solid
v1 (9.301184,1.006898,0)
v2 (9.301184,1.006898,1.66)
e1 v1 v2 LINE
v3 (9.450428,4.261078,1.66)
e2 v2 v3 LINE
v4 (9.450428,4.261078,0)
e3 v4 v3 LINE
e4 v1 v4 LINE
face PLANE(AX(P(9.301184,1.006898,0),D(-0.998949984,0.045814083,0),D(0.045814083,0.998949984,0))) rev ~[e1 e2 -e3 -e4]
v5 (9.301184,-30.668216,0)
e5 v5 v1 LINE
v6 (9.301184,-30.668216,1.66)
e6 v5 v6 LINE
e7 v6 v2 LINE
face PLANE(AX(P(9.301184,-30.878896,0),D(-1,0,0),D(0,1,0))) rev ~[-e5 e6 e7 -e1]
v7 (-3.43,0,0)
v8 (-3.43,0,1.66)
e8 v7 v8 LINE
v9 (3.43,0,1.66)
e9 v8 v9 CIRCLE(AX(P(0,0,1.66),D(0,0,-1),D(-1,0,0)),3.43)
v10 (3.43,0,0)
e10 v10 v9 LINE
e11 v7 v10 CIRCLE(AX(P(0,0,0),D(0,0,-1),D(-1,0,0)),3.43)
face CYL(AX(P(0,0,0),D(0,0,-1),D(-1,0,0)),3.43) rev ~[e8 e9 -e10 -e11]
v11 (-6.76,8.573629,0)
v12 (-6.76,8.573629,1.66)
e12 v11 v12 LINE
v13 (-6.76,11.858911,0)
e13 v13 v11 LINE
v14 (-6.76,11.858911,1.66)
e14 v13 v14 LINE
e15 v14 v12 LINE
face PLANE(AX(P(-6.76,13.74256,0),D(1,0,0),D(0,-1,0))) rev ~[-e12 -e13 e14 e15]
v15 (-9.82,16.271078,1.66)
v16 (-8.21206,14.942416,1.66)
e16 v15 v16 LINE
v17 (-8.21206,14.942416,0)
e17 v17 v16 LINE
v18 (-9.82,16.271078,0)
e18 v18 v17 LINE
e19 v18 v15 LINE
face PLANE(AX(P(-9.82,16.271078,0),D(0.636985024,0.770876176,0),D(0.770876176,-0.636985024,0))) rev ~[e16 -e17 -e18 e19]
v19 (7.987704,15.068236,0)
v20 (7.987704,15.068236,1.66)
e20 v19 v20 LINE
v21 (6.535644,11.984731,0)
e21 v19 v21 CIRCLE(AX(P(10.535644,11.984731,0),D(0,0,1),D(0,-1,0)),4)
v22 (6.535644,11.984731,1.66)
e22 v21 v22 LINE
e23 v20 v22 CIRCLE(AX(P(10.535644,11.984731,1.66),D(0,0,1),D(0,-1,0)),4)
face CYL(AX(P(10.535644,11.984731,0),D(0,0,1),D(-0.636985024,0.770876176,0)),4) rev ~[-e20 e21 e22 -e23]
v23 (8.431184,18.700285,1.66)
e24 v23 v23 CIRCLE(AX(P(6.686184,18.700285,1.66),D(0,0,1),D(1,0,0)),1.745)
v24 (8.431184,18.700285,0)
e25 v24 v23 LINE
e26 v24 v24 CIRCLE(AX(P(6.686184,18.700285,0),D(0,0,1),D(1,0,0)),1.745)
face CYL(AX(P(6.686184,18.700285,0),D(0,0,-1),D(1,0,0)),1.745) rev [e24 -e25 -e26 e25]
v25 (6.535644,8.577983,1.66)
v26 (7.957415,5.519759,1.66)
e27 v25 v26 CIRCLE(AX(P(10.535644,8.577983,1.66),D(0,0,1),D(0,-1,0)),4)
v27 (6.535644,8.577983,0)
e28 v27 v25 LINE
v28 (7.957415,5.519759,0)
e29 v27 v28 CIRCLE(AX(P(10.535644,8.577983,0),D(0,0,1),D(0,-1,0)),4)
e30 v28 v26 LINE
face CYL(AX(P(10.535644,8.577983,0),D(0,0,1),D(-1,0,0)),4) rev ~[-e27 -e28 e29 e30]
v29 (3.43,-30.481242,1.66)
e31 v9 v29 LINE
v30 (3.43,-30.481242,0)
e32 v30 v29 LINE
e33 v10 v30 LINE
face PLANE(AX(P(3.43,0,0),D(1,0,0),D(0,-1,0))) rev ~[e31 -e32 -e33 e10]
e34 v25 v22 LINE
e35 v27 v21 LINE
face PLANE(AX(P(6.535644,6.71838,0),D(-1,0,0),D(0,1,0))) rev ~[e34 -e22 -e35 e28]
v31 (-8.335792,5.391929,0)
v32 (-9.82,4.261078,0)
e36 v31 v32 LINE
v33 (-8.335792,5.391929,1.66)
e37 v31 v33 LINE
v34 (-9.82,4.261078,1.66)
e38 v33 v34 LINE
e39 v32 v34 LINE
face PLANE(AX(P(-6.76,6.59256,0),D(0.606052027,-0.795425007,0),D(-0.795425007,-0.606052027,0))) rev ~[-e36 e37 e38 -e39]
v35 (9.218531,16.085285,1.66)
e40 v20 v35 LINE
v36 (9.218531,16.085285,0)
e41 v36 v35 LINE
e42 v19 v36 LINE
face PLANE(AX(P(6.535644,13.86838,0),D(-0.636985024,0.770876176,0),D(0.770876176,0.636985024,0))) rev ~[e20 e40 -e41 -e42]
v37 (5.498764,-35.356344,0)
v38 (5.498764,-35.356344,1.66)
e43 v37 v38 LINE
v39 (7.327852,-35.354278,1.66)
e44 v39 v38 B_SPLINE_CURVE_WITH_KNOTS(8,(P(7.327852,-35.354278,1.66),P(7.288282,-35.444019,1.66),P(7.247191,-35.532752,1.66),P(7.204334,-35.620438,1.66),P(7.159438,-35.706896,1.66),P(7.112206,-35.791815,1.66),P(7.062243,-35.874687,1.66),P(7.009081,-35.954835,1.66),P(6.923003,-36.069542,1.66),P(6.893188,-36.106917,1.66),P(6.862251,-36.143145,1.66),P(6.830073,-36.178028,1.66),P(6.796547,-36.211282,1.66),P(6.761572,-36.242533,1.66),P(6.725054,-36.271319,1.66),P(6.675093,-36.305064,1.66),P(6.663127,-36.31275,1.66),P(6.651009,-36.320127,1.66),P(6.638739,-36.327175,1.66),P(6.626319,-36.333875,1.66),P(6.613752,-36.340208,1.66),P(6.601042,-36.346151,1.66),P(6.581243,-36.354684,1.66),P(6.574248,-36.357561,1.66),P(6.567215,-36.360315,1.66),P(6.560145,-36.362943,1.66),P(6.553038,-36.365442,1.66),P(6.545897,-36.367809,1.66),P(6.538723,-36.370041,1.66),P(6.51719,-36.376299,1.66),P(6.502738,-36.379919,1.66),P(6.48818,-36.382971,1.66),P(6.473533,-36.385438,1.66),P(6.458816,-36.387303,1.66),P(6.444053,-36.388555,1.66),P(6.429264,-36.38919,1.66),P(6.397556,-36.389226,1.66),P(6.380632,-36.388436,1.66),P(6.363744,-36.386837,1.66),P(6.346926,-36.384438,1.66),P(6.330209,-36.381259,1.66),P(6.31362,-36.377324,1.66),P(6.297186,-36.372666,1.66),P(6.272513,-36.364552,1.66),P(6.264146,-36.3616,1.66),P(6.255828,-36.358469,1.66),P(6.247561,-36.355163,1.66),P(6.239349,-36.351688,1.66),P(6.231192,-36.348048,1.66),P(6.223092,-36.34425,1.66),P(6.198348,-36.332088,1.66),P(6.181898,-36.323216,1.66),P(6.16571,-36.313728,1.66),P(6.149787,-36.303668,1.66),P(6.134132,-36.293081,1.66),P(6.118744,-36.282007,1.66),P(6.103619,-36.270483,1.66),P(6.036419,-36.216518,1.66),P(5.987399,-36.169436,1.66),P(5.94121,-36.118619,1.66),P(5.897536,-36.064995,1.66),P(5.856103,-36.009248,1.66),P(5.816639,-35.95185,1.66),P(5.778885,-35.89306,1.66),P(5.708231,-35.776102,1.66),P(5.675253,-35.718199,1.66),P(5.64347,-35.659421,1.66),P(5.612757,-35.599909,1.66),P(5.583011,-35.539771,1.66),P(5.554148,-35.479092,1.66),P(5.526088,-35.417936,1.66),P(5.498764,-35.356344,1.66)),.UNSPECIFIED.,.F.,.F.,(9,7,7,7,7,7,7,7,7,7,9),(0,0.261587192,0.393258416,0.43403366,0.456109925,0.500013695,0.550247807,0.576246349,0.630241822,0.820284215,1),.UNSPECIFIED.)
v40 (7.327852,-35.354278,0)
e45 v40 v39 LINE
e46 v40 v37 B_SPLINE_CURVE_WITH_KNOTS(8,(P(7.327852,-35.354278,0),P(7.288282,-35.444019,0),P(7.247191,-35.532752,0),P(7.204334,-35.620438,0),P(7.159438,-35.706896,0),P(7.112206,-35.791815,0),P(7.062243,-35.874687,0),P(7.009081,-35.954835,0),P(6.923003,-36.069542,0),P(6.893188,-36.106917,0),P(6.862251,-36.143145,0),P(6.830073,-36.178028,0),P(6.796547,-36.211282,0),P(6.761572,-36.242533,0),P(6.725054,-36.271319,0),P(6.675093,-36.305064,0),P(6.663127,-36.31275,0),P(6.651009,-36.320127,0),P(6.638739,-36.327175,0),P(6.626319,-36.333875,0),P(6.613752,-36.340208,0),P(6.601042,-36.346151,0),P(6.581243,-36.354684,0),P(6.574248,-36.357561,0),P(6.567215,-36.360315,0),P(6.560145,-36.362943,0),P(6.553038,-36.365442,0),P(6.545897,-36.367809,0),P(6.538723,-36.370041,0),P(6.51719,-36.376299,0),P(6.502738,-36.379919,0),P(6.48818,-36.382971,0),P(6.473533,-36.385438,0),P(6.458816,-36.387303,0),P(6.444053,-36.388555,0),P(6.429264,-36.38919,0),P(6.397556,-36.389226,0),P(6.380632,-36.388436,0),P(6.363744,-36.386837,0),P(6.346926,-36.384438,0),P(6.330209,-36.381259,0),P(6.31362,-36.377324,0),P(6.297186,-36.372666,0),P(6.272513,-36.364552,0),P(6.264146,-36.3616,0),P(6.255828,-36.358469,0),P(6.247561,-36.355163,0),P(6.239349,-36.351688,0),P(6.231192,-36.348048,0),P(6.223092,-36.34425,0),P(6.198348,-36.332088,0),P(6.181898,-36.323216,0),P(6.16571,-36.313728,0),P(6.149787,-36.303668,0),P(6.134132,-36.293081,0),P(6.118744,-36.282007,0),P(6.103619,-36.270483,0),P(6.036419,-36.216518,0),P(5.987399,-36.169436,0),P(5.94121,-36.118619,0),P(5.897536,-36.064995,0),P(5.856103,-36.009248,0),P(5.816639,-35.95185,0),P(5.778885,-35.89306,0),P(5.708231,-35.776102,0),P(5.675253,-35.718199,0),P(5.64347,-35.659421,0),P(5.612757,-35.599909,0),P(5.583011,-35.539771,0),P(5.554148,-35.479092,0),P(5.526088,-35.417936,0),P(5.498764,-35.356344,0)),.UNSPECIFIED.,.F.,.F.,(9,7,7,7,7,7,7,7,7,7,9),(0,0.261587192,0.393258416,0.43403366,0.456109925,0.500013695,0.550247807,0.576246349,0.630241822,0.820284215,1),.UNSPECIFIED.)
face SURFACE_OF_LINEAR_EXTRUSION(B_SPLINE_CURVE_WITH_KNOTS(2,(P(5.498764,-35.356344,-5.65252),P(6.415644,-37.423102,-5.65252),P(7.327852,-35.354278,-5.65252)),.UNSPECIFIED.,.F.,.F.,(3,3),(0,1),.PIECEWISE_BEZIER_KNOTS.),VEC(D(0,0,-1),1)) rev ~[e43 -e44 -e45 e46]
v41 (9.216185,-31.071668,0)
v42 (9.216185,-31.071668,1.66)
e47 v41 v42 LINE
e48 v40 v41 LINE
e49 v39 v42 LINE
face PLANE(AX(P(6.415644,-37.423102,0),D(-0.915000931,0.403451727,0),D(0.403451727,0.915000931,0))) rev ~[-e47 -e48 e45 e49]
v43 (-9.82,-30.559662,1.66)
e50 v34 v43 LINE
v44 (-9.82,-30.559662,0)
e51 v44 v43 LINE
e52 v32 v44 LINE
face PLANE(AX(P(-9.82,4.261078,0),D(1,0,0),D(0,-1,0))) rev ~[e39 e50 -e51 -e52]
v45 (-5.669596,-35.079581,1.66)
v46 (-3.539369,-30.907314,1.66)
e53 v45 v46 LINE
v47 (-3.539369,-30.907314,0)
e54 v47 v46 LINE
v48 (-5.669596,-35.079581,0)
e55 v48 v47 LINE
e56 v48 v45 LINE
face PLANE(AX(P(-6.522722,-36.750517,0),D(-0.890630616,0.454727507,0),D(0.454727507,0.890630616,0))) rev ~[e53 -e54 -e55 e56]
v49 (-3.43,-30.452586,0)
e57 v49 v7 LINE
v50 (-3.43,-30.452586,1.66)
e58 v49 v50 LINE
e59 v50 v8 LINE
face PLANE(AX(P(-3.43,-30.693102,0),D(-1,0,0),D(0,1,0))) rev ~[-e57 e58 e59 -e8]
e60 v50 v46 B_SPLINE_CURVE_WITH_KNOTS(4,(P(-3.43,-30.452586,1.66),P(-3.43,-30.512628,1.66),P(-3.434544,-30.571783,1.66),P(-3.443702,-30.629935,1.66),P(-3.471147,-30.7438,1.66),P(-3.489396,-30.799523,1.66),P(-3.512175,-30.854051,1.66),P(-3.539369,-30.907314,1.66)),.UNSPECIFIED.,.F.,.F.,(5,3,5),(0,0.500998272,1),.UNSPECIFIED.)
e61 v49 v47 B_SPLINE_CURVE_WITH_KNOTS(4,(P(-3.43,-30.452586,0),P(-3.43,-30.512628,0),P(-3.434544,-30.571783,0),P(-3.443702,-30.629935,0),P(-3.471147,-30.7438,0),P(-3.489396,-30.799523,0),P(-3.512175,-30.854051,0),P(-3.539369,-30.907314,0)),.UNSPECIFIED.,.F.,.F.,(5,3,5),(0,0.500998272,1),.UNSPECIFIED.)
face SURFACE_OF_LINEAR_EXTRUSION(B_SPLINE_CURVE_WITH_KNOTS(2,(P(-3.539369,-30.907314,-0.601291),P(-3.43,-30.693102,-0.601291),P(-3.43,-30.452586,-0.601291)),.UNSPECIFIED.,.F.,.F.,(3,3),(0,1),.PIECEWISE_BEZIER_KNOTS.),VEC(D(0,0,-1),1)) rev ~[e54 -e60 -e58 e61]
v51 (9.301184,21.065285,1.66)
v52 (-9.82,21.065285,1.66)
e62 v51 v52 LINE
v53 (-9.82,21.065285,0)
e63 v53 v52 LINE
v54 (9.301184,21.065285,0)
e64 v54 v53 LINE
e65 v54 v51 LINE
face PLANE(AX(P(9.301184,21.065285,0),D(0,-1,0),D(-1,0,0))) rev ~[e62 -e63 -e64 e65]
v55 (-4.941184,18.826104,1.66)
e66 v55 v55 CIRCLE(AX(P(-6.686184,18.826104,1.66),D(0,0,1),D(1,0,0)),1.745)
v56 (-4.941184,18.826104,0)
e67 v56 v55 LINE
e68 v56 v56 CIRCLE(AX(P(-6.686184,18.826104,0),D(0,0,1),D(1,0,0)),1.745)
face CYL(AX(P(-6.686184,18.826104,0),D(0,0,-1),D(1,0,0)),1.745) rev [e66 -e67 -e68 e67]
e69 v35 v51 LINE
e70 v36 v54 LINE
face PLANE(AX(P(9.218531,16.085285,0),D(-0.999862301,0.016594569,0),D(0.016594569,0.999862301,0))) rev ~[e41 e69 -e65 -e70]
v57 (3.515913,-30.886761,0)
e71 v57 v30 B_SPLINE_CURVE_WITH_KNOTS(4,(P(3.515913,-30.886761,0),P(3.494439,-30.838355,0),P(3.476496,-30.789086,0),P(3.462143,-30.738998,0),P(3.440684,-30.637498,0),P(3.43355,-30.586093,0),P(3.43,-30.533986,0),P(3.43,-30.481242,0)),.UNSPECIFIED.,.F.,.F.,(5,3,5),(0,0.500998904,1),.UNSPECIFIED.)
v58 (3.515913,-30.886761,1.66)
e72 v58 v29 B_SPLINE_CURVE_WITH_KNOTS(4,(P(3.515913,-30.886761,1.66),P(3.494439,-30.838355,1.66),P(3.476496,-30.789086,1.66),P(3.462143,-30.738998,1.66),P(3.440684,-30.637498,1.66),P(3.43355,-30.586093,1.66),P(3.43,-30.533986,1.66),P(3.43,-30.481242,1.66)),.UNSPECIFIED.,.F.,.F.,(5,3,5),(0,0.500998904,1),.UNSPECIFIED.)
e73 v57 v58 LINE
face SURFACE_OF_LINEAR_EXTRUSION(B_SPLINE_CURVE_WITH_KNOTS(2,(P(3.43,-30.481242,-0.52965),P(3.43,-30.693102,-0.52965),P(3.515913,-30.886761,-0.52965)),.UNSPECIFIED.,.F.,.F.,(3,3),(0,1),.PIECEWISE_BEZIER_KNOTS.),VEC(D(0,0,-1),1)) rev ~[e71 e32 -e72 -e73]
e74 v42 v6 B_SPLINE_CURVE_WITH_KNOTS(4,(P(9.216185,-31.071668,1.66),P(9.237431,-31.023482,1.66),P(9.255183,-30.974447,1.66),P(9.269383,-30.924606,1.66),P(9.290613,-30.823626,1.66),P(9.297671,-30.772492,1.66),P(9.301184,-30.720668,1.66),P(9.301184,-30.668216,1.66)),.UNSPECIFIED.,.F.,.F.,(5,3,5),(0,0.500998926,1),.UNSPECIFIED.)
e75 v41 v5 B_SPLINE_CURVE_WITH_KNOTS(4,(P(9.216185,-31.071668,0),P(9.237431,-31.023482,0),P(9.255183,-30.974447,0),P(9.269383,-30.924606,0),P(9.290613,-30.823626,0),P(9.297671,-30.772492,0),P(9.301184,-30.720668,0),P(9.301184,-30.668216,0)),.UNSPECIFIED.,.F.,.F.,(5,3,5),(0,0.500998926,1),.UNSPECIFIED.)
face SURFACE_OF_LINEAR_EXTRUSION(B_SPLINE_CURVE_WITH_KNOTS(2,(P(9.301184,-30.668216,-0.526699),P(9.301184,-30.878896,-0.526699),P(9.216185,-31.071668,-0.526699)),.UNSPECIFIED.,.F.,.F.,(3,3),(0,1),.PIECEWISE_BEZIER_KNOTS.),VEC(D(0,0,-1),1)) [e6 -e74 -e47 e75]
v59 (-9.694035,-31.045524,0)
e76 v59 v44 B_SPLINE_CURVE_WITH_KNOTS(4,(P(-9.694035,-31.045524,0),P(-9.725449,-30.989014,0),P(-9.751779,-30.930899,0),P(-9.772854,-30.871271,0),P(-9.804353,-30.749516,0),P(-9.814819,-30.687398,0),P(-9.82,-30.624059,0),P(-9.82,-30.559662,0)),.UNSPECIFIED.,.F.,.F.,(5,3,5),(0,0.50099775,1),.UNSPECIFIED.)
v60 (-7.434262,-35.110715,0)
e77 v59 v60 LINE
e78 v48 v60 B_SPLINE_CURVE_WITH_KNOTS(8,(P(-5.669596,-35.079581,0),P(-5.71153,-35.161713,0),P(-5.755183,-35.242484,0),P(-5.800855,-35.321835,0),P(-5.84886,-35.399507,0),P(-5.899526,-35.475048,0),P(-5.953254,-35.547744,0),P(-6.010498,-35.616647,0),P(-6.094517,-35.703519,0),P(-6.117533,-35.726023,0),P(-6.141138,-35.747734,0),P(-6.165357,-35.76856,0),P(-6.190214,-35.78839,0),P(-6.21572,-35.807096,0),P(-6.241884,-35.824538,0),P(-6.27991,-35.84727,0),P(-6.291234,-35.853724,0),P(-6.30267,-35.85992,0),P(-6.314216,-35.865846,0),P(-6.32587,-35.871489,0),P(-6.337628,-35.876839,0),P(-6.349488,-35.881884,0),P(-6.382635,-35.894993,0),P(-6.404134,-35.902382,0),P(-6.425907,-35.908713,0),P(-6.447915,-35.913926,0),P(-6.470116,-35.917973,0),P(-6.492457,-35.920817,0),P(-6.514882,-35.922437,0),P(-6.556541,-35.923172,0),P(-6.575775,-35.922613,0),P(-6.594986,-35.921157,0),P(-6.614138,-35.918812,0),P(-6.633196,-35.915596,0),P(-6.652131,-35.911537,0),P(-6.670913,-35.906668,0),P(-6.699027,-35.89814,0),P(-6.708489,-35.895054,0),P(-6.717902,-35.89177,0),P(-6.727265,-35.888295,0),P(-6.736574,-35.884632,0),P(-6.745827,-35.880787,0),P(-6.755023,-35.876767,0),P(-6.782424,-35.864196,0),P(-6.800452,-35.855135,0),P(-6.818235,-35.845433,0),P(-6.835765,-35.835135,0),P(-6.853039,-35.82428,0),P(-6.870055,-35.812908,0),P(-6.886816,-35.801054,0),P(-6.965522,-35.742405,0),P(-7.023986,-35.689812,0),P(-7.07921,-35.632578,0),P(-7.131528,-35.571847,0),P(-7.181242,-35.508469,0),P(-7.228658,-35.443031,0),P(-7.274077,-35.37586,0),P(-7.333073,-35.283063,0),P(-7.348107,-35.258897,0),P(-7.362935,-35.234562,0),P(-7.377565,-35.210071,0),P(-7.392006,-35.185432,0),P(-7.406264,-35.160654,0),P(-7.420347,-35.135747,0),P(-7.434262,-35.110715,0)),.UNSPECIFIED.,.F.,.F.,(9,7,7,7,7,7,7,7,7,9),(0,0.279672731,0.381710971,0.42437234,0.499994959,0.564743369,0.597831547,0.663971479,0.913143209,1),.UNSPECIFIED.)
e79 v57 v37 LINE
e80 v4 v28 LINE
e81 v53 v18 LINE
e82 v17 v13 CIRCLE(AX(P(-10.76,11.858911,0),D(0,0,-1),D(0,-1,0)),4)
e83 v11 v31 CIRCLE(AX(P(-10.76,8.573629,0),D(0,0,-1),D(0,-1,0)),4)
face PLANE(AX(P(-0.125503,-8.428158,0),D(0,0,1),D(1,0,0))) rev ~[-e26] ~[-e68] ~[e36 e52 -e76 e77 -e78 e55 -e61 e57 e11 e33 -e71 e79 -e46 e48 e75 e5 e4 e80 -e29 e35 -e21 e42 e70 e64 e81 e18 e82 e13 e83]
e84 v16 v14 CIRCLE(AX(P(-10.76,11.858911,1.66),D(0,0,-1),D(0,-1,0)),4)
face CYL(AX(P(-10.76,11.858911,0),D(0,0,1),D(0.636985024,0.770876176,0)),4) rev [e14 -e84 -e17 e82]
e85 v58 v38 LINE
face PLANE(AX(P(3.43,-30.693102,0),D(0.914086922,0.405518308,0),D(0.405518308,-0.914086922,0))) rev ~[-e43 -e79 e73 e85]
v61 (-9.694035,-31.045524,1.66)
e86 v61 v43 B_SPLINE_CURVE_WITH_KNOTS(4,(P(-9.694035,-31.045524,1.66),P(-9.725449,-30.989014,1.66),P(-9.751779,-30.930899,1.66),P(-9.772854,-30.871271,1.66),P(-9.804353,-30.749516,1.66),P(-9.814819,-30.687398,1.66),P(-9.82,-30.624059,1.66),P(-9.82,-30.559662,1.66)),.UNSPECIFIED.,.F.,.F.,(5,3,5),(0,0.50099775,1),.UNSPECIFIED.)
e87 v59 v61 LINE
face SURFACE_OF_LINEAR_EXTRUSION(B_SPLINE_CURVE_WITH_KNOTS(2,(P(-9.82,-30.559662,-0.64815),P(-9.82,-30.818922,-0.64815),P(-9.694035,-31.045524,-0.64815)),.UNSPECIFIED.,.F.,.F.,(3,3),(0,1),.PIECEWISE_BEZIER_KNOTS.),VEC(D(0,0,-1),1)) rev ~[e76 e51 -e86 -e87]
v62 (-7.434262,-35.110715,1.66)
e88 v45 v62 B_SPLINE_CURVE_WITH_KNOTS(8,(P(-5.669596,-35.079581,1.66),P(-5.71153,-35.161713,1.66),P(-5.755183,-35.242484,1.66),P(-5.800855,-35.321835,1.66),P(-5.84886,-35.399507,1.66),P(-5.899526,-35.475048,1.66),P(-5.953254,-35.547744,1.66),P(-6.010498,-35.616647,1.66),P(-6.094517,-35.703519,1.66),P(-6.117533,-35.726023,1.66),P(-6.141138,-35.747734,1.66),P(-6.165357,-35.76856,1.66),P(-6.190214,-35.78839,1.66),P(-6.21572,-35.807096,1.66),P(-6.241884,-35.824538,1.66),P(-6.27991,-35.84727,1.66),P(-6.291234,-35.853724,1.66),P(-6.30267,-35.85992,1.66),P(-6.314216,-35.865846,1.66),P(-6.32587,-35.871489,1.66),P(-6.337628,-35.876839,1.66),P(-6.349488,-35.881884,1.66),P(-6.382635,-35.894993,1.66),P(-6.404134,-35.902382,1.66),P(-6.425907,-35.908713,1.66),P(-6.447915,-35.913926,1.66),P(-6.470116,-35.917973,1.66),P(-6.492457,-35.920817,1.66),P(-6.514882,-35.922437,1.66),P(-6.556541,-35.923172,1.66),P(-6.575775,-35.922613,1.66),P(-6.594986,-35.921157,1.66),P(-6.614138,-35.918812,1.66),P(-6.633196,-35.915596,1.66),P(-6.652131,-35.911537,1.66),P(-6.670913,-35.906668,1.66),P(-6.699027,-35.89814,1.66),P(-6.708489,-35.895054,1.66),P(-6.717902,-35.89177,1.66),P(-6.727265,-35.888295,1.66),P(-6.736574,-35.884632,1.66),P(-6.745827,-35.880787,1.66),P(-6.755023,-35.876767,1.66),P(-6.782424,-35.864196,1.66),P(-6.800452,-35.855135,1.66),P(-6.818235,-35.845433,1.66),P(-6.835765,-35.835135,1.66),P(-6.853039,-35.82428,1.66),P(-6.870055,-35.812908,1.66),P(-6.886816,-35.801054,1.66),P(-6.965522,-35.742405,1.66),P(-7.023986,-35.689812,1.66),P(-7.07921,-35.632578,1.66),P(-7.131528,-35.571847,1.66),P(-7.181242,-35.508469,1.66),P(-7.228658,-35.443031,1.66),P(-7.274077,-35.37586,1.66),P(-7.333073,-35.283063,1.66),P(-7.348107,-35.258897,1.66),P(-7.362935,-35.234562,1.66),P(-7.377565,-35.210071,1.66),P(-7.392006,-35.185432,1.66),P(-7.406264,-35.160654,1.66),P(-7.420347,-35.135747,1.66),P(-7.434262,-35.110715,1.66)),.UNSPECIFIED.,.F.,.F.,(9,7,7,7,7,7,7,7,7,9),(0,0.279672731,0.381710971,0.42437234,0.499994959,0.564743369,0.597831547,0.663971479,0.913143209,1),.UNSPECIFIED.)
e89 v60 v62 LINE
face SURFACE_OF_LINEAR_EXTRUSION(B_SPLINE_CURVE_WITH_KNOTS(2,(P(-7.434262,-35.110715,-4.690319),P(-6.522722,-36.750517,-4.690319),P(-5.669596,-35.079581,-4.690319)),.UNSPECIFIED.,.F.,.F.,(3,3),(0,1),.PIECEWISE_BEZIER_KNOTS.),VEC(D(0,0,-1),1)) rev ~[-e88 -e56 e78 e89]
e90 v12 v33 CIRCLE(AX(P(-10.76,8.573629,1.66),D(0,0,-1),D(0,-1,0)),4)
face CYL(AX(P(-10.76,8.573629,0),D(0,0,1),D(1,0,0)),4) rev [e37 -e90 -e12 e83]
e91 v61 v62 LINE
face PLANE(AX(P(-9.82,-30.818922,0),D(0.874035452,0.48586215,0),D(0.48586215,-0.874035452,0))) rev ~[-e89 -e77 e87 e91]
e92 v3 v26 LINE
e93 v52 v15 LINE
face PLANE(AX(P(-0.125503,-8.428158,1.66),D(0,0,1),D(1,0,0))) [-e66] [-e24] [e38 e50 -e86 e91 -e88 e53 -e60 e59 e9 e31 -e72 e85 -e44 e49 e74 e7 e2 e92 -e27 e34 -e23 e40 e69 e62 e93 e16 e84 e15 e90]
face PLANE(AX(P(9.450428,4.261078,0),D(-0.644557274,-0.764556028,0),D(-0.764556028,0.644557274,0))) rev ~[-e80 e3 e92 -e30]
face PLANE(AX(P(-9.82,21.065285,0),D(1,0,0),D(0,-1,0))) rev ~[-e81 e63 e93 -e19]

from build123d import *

# Parameters (mm, degrees)
F0_R         = 1.745
F1_DEPTH     = 1.66
F2_R         = 4
F3_T1_DEPTH  = 11.0406372139
F3_T3_DEPTH  = 2.9562992506
F3_T5_DEPTH  = 2.7192996153
F3_T7_DEPTH  = 12.9650408158
F3_T9_DEPTH  = 2.8625815694
F3_T11_DEPTH = 2.7133982533


# Not quite as in the source:
# - a fillet or chamfer that OpenCascade refuses, or shapes differently, is made with other operations: its cross-section is extruded or revolved along the edge and cut away or added


with BuildPart() as f1:
    # F0 (on Top) → F1 (new body)
    with BuildSketch(Plane.XY):
        with BuildLine():
            Line((9.301183783, 21.0652845629), (-9.82, 21.0652845629))
            Line((-9.82, 21.0652845629), (-9.82, 16.2710778286))
            Line((-9.82, 16.2710778286), (-6.76, 13.7425599752))
            Line((-6.76, 13.7425599752), (-6.76, 6.5925599752))
            Line((-6.76, 6.5925599752), (-9.82, 4.2610778286))
            Line((-9.82, 4.2610778286), (-9.82, 0.8810778286))
            Line((-9.82, 0.8810778286), (-9.82, -30.8189221714))
            Line((-9.82, -30.8189221714), (-6.5227223381, -36.7505173139))
            Line((-6.5227223381, -36.7505173139), (-3.43, -30.6931023543))
            Line((-3.43, -30.6931023543), (-3.43, 0))
            ThreePointArc((-3.43, 0), (0, 3.43), (3.43, 0))
            Line((3.43, 0), (3.43, -30.6931023543))
            Line((3.43, -30.6931023543), (6.4156440855, -37.4231023543))
            Line((6.4156440855, -37.4231023543), (9.301183783, -30.87889562))
            Line((9.301183783, -30.87889562), (9.301183783, 1.0068976457))
            Line((9.301183783, 1.0068976457), (9.4504277734, 4.2610778286))
            Line((9.4504277734, 4.2610778286), (6.5356440855, 6.7183797924))
            Line((6.5356440855, 6.7183797924), (6.5356440855, 13.8683797924))
            Line((6.5356440855, 13.8683797924), (9.2185314492, 16.0852845629))
            Line((9.2185314492, 16.0852845629), (9.301183783, 21.0652845629))
        make_face()
        with Locations((-6.686183783, 18.82610438)):
            Circle(F0_R, mode=Mode.SUBTRACT)
        with Locations((6.686183783, 18.7002845629)):
            Circle(F0_R, mode=Mode.SUBTRACT)
    extrude(amount=F1_DEPTH)

    # F2
    f2_edges = [f1.edges().sort_by_distance(p)[0] for p in [
        (-6.76, 6.59256, 0.83),
        (-6.76, 13.74256, 0.83),
        (6.535644, 6.71838, 0.83),
        (6.535644, 13.86838, 0.83),
    ]]
    fillet(f2_edges, radius=F2_R)

    # F3: fillet of radius 1 on 6 edges, made by hand

    # F3_s2 → F3_t1 (cut)
    with BuildSketch(Plane.XY.offset(-4.690318607)):
        with BuildLine():
            add(Edge.make_bspline(
                [(-7.4342616517, -35.110715417), (-6.5227223381, -36.7505173139), (-5.6695955837, -35.0795807734)],
                knots=[0, 0, 0, 1, 1, 1], degree=2, weights=[1, 1, 1]))
            Line((-5.6695955837, -35.0795807734), (-6.5227223381, -36.7505173139))
            Line((-6.5227223381, -36.7505173139), (-7.4342616517, -35.110715417))
        make_face()
    extrude(amount=F3_T1_DEPTH, mode=Mode.SUBTRACT)

    # F3_s4 → F3_t3 (cut)
    with BuildSketch(Plane.XY.offset(-0.6481496253)):
        with BuildLine():
            add(Edge.make_bspline(
                [(-9.82, -30.5596623213), (-9.82, -30.8189221714), (-9.6940354517, -31.0455244716)],
                knots=[0, 0, 0, 1, 1, 1], degree=2, weights=[1, 1, 1]))
            Line((-9.6940354517, -31.0455244716), (-9.82, -30.8189221714))
            Line((-9.82, -30.8189221714), (-9.82, -30.5596623213))
        make_face()
    extrude(amount=F3_T3_DEPTH, mode=Mode.SUBTRACT)

    # F3_s6 → F3_t5 (cut)
    with BuildSketch(Plane.XY.offset(-0.5296498077)):
        with BuildLine():
            add(Edge.make_bspline(
                [(3.43, -30.4812424312), (3.43, -30.6931023543), (3.5159130776, -30.8867607393)],
                knots=[0, 0, 0, 1, 1, 1], degree=2, weights=[1, 1, 1]))
            Line((3.5159130776, -30.8867607393), (3.43, -30.6931023543))
            Line((3.43, -30.6931023543), (3.43, -30.4812424312))
        make_face()
    extrude(amount=F3_T5_DEPTH, mode=Mode.SUBTRACT)

    # F3_s8 → F3_t7 (cut)
    with BuildSketch(Plane.XY.offset(-5.6525204079)):
        with BuildLine():
            add(Edge.make_bspline(
                [(5.4987638806, -35.3563443608), (6.4156440855, -37.4231023543), (7.3278517341, -35.3542777798)],
                knots=[0, 0, 0, 1, 1, 1], degree=2, weights=[1, 1, 1]))
            Line((7.3278517341, -35.3542777798), (6.4156440855, -37.4231023543))
            Line((6.4156440855, -37.4231023543), (5.4987638806, -35.3563443608))
        make_face()
    extrude(amount=F3_T7_DEPTH, mode=Mode.SUBTRACT)

    # F3_s10 → F3_t9 (cut)
    with BuildSketch(Plane.XY.offset(-0.6012907847)):
        with BuildLine():
            add(Edge.make_bspline(
                [(-3.5393693837, -30.9073135471), (-3.43, -30.6931023543), (-3.43, -30.4525860404)],
                knots=[0, 0, 0, 1, 1, 1], degree=2, weights=[1, 1, 1]))
            Line((-3.43, -30.4525860404), (-3.43, -30.6931023543))
            Line((-3.43, -30.6931023543), (-3.5393693837, -30.9073135471))
        make_face()
    extrude(amount=F3_T9_DEPTH, mode=Mode.SUBTRACT)

    # F3_s12 → F3_t11 (cut)
    with BuildSketch(Plane.XY.offset(-0.5266991266)):
        with BuildLine():
            add(Edge.make_bspline(
                [(9.301183783, -30.6682159693), (9.301183783, -30.87889562), (9.2161847141, -31.0716676965)],
                knots=[0, 0, 0, 1, 1, 1], degree=2, weights=[1, 1, 1]))
            Line((9.2161847141, -31.0716676965), (9.301183783, -30.87889562))
            Line((9.301183783, -30.87889562), (9.301183783, -30.6682159693))
        make_face()
    extrude(amount=F3_T11_DEPTH, mode=Mode.SUBTRACT)


solid = f1.part
